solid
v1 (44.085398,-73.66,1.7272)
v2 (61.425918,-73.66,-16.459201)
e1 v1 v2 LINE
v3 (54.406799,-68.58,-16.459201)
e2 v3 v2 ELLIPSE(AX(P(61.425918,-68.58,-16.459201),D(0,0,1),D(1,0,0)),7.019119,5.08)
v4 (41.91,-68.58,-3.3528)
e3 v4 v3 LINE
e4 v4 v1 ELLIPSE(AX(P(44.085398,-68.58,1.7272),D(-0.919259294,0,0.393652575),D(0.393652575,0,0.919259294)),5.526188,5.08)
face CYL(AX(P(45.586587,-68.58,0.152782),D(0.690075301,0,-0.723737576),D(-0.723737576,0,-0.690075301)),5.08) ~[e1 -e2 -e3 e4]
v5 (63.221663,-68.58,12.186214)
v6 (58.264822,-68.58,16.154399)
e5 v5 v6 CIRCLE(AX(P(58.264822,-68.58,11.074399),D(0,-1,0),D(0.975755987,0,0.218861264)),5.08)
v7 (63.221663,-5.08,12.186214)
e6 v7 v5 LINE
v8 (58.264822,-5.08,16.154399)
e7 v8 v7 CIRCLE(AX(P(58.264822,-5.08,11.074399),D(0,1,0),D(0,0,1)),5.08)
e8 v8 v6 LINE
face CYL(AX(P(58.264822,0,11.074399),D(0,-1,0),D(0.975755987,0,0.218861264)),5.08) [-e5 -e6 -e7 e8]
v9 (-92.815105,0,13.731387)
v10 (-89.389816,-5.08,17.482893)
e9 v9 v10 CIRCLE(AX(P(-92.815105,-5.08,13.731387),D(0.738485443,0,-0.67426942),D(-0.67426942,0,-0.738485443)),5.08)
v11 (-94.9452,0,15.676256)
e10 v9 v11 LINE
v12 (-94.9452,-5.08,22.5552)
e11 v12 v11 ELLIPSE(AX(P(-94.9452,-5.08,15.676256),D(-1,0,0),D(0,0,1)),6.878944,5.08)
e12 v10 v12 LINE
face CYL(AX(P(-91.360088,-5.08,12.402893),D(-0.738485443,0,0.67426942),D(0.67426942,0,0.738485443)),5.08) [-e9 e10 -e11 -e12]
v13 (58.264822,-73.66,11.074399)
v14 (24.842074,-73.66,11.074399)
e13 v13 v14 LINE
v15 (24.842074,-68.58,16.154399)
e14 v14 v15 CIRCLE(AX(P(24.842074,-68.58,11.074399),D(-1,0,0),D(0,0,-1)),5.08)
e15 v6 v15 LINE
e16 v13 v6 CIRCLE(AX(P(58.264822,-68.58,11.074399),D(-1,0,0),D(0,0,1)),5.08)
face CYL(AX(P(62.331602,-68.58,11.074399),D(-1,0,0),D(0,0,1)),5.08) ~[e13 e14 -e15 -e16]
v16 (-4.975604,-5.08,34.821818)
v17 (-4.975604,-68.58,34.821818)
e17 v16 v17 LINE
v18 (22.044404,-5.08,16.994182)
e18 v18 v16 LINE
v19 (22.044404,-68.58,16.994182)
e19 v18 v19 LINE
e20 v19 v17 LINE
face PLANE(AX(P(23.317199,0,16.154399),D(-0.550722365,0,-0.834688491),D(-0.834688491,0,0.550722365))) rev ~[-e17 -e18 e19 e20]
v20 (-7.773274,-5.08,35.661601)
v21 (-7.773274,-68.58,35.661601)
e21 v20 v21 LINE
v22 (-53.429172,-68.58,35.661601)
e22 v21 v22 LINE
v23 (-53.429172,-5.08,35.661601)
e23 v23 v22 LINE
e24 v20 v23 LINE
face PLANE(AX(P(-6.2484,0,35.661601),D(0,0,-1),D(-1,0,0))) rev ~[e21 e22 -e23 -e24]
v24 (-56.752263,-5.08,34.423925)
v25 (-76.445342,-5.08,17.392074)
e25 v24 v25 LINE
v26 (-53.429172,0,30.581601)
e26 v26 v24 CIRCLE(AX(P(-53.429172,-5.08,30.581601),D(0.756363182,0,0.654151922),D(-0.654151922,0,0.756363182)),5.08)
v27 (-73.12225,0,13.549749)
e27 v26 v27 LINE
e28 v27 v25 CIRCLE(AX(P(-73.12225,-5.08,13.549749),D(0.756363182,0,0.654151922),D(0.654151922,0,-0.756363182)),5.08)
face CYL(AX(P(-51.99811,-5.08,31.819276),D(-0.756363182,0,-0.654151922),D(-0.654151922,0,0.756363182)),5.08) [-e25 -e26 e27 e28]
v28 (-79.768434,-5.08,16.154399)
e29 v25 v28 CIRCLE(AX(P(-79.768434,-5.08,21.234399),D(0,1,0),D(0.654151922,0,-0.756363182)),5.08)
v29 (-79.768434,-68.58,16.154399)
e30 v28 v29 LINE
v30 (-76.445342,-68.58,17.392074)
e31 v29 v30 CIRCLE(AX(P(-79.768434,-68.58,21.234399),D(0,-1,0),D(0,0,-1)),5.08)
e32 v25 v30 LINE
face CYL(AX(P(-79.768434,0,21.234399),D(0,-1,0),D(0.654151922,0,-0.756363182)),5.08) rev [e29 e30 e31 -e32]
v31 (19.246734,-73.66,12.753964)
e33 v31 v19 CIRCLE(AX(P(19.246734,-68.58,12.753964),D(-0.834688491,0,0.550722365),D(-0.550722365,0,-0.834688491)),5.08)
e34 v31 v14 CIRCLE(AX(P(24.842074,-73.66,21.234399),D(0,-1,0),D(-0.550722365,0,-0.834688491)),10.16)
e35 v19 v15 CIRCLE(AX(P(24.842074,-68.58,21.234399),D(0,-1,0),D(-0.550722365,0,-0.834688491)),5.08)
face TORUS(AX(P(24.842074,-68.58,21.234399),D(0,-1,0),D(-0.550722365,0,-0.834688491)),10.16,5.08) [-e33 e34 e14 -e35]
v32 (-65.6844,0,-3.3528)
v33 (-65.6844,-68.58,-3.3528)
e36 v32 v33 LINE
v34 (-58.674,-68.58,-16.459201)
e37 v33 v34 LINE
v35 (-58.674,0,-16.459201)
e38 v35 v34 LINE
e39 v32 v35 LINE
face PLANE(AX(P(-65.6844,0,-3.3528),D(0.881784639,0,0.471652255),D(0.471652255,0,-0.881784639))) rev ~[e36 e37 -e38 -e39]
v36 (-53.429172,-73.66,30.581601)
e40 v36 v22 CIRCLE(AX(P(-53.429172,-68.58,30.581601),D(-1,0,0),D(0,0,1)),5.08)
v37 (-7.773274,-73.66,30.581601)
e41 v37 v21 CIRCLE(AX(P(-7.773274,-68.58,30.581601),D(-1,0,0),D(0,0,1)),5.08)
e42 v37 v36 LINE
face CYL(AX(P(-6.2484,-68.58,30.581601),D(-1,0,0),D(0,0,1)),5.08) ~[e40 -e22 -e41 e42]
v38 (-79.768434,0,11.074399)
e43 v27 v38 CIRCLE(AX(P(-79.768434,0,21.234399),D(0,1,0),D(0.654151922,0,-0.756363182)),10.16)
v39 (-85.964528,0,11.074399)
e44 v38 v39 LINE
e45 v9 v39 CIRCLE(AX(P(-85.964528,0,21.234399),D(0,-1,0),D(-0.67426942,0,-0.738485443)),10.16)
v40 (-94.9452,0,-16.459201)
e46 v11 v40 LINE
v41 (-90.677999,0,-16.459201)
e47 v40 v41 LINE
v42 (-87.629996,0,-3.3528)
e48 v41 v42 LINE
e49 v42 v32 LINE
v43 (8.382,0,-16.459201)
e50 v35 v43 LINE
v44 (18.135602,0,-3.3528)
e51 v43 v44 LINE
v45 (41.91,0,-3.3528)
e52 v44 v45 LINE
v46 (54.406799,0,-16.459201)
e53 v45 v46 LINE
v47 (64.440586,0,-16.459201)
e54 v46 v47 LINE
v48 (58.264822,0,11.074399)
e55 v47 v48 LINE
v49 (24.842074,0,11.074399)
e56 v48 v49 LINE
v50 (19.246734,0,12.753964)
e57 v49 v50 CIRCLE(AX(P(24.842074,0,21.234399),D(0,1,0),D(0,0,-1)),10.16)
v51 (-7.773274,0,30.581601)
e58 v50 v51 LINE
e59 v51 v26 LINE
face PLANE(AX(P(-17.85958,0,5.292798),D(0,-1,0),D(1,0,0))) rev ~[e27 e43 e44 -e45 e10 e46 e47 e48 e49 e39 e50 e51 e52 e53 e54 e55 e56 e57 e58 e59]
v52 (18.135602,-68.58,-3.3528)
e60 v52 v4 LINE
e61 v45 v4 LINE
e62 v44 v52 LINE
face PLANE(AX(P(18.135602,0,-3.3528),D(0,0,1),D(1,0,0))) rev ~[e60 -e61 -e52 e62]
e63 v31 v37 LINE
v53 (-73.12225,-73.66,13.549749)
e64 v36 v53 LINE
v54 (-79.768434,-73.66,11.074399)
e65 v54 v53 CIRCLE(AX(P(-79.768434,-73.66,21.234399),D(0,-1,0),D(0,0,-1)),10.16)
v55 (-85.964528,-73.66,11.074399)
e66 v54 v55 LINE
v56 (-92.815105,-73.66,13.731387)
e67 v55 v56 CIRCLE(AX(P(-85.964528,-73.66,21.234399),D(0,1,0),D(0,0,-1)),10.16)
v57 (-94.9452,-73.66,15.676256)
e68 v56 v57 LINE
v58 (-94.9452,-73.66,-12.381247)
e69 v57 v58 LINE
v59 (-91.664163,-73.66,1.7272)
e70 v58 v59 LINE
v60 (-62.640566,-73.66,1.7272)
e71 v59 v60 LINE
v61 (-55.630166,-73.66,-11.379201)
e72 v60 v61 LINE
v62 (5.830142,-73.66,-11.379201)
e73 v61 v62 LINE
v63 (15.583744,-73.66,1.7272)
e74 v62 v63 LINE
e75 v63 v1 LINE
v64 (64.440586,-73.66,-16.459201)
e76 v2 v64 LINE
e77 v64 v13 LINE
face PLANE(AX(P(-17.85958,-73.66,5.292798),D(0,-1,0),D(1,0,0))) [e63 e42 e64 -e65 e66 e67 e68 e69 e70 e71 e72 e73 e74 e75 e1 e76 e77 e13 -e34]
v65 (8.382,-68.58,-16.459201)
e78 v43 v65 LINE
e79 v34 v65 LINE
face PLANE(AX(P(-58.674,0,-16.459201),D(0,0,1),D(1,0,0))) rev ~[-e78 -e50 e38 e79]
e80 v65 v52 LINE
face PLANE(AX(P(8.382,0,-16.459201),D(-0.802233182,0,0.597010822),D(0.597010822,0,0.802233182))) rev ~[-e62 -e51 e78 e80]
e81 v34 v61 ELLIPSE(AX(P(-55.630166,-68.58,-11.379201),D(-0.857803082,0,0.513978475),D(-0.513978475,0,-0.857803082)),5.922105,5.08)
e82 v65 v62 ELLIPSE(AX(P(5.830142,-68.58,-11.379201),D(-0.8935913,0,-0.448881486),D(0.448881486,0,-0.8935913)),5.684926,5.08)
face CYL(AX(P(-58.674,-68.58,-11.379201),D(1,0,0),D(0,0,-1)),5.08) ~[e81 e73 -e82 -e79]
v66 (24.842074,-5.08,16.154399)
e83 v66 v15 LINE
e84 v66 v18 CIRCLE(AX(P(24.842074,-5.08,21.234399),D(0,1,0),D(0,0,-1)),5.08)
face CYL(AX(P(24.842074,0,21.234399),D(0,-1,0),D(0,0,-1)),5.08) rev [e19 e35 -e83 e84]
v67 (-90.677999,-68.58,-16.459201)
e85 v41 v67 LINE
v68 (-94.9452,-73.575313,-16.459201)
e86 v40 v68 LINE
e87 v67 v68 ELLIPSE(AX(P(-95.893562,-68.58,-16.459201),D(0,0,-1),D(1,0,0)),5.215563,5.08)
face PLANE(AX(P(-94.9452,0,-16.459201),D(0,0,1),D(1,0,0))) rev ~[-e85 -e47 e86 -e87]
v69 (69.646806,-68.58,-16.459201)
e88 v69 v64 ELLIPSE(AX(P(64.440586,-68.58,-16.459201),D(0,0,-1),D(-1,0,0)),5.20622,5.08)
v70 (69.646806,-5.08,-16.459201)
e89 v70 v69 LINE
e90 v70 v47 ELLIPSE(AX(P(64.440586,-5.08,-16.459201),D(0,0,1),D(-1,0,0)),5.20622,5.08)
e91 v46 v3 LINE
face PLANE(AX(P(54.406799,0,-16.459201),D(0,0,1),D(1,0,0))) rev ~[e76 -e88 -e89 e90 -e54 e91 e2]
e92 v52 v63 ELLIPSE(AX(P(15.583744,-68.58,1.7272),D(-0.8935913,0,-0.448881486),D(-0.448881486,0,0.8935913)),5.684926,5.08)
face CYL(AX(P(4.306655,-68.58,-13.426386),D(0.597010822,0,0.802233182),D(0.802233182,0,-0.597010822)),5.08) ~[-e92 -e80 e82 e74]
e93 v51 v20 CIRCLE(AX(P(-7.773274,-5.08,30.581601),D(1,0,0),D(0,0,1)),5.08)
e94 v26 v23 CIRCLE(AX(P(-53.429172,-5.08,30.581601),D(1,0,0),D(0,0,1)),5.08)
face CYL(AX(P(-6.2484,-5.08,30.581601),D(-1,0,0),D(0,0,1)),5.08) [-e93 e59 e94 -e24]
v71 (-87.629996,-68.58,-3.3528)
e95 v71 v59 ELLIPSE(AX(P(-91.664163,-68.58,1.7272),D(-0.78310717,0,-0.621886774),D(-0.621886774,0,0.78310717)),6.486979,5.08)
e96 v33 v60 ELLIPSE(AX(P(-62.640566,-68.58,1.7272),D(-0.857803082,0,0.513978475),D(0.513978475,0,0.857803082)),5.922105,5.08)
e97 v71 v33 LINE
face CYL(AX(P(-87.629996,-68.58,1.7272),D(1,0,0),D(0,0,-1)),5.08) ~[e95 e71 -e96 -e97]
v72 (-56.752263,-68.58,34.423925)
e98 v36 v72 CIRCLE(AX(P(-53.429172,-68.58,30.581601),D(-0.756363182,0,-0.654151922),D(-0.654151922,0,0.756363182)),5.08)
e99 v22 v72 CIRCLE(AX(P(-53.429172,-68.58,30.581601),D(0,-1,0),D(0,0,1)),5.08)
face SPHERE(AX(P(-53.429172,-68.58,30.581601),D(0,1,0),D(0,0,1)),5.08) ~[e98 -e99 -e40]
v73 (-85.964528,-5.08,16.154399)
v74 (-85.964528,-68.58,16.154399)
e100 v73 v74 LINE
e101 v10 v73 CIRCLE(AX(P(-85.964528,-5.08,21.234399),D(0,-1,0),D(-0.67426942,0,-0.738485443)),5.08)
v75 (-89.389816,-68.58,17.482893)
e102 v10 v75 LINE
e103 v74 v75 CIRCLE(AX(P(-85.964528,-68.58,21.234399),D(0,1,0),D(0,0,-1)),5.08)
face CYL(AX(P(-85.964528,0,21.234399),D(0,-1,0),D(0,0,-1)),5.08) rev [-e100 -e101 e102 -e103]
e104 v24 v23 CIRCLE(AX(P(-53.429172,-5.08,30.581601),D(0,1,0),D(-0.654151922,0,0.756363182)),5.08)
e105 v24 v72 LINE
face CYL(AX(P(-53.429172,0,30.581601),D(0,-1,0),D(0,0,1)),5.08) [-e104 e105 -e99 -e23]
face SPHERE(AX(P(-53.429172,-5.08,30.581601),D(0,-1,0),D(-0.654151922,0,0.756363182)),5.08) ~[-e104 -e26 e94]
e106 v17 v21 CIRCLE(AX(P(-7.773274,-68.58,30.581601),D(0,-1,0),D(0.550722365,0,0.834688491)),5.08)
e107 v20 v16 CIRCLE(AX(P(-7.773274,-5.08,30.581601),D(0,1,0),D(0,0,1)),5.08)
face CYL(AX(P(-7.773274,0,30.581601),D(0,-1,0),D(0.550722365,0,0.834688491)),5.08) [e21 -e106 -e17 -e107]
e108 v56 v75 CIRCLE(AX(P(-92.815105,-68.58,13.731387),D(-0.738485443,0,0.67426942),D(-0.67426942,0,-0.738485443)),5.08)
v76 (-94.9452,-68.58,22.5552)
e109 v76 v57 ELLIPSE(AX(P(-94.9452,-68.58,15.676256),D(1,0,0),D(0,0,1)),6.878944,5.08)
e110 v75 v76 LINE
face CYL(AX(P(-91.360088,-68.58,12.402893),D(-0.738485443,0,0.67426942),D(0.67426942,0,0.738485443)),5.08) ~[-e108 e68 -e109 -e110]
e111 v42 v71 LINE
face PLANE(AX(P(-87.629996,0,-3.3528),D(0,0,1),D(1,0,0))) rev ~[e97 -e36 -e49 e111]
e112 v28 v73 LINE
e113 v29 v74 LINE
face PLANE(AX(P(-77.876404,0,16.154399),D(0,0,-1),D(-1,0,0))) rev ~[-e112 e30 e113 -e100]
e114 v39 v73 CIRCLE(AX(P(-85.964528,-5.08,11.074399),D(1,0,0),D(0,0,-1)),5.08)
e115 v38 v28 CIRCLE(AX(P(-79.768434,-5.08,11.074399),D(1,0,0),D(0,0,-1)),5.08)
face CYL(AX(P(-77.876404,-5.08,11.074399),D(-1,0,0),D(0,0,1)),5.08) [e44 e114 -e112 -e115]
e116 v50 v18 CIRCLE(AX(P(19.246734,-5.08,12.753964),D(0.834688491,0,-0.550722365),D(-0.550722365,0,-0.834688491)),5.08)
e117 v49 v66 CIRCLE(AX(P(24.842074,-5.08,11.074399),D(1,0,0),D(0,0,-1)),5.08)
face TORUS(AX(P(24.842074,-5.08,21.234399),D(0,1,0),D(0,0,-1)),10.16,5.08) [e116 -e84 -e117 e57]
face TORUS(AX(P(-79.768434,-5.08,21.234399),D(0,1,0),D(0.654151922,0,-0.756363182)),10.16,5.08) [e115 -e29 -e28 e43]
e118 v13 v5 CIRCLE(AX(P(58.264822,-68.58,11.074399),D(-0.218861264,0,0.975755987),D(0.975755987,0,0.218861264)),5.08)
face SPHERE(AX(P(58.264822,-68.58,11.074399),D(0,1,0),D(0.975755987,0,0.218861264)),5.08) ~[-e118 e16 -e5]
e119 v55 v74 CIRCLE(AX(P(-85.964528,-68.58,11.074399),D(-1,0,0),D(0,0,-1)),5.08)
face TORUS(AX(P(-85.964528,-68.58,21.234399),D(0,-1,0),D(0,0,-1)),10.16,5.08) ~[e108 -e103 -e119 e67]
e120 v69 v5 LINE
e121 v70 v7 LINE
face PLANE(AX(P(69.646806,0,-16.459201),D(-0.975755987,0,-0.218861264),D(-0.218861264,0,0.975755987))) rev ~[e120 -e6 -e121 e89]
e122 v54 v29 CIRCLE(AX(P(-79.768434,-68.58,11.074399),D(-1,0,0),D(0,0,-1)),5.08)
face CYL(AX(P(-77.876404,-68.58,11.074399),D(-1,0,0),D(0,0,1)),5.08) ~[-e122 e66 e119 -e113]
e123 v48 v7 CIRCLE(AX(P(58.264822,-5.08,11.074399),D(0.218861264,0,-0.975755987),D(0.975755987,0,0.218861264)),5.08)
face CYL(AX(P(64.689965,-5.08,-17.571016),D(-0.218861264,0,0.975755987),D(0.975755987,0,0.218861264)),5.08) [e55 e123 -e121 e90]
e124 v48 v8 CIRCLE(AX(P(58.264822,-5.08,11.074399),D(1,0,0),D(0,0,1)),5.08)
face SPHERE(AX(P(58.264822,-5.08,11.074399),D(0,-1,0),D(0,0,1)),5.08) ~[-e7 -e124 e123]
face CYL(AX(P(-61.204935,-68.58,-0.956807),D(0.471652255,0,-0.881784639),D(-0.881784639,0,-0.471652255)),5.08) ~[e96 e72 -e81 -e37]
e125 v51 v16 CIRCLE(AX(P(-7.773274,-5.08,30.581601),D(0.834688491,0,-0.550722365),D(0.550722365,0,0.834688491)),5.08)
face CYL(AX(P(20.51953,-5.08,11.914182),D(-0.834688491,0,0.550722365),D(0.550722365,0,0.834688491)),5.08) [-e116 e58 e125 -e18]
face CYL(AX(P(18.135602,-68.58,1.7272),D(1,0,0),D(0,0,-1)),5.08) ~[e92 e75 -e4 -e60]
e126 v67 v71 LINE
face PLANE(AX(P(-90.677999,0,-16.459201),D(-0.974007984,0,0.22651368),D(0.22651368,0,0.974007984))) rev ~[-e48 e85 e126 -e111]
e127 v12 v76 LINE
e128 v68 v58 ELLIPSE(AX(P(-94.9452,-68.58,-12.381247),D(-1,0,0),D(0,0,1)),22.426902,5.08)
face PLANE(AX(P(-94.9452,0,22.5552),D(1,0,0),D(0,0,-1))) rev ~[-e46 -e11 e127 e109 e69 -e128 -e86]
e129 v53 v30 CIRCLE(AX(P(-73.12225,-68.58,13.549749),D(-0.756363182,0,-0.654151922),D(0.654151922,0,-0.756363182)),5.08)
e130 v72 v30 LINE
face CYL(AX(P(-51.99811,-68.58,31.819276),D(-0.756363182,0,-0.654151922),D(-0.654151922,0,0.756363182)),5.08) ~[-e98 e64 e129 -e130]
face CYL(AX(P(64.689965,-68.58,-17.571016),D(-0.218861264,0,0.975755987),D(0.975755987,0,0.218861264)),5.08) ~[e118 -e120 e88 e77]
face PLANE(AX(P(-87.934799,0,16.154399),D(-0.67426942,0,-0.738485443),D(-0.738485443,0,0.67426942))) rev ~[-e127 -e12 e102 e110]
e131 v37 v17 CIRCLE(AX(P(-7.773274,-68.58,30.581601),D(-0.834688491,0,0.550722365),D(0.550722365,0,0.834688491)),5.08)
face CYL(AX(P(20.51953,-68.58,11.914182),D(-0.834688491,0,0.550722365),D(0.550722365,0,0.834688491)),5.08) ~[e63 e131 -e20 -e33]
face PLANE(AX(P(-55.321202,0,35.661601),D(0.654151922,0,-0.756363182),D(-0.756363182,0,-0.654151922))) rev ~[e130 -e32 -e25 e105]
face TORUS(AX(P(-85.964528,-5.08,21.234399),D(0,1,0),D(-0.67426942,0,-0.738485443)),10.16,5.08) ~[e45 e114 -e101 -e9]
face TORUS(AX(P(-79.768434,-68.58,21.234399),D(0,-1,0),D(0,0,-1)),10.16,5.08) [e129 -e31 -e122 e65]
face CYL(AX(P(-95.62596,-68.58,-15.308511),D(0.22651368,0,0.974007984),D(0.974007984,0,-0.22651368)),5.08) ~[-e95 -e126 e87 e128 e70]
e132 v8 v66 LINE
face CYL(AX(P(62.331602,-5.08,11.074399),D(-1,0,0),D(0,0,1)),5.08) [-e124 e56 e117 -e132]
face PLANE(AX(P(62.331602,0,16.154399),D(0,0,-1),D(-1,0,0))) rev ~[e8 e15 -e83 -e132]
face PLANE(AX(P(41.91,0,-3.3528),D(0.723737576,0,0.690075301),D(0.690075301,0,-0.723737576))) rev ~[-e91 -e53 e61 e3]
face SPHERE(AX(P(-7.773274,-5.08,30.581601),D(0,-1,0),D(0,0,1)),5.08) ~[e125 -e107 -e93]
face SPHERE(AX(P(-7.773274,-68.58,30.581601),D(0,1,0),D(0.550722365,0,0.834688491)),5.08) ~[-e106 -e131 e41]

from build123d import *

# Parameters (mm, degrees)
F1_DEPTH = 73.66
F2_R     = 5.08


with BuildPart() as f1:
    # F0 (on Front) → F1 (new body)
    with BuildSketch(Plane.XZ):
        Polygon((-94.9451997876, 22.5552003831), (-94.9451997876, -16.4592005312), (-90.67799896, -16.4592005312), (-87.6299962401, -3.3528001513), (-65.6844004989, -3.3528001513), (-58.6740002036, -16.4592005312), (8.3820000291, -16.4592005312), (18.1356016546, -3.3528001513), (41.9100001454, -3.3528001513), (54.406799376, -16.4592005312), (69.6468055248, -16.4592005312), (62.3316019773, 16.1543991417), (23.3171992004, 16.1543991417), (-6.2483996153, 35.6616005301), (-55.3212016821, 35.6616005301), (-77.8764039278, 16.1543991417), (-87.9347994924, 16.1543991417), align=None)
    extrude(amount=F1_DEPTH)

    # F2
    f2_edges = [f1.edges().sort_by_distance(p)[0] for p in [
        (65.989204, 0, -0.152401),
        (62.331602, -36.83, 16.154399),
        (65.989204, -73.66, -0.152401),
        (42.824401, 0, 16.154399),
        (8.5344, 0, 25.908),
        (-6.2484, -36.83, 35.661601),
        (8.5344, -73.66, 25.908),
        (42.824401, -73.66, 16.154399),
        (23.317199, -36.83, 16.154399),
        (-30.784801, 0, 35.661601),
        (-55.321202, -36.83, 35.661601),
        (-30.784801, -73.66, 35.661601),
        (-66.598803, -73.66, 25.908),
        (-77.876404, -36.83, 16.154399),
        (-66.598803, 0, 25.908),
        (-82.905602, 0, 16.154399),
        (-87.934799, -36.83, 16.154399),
        (-89.153998, -73.66, -9.906),
        (-76.657198, -73.66, -3.3528),
        (-62.1792, -73.66, -9.906),
        (-25.146, -73.66, -16.459201),
        (13.258801, -73.66, -9.906),
        (30.022801, -73.66, -3.3528),
        (48.1584, -73.66, -9.906),
        (-82.905602, -73.66, 16.154399),
        (-91.44, 0, 19.3548),
        (-91.44, -73.66, 19.3548),
    ]]
    fillet(f2_edges, radius=F2_R)


solid = f1.part
